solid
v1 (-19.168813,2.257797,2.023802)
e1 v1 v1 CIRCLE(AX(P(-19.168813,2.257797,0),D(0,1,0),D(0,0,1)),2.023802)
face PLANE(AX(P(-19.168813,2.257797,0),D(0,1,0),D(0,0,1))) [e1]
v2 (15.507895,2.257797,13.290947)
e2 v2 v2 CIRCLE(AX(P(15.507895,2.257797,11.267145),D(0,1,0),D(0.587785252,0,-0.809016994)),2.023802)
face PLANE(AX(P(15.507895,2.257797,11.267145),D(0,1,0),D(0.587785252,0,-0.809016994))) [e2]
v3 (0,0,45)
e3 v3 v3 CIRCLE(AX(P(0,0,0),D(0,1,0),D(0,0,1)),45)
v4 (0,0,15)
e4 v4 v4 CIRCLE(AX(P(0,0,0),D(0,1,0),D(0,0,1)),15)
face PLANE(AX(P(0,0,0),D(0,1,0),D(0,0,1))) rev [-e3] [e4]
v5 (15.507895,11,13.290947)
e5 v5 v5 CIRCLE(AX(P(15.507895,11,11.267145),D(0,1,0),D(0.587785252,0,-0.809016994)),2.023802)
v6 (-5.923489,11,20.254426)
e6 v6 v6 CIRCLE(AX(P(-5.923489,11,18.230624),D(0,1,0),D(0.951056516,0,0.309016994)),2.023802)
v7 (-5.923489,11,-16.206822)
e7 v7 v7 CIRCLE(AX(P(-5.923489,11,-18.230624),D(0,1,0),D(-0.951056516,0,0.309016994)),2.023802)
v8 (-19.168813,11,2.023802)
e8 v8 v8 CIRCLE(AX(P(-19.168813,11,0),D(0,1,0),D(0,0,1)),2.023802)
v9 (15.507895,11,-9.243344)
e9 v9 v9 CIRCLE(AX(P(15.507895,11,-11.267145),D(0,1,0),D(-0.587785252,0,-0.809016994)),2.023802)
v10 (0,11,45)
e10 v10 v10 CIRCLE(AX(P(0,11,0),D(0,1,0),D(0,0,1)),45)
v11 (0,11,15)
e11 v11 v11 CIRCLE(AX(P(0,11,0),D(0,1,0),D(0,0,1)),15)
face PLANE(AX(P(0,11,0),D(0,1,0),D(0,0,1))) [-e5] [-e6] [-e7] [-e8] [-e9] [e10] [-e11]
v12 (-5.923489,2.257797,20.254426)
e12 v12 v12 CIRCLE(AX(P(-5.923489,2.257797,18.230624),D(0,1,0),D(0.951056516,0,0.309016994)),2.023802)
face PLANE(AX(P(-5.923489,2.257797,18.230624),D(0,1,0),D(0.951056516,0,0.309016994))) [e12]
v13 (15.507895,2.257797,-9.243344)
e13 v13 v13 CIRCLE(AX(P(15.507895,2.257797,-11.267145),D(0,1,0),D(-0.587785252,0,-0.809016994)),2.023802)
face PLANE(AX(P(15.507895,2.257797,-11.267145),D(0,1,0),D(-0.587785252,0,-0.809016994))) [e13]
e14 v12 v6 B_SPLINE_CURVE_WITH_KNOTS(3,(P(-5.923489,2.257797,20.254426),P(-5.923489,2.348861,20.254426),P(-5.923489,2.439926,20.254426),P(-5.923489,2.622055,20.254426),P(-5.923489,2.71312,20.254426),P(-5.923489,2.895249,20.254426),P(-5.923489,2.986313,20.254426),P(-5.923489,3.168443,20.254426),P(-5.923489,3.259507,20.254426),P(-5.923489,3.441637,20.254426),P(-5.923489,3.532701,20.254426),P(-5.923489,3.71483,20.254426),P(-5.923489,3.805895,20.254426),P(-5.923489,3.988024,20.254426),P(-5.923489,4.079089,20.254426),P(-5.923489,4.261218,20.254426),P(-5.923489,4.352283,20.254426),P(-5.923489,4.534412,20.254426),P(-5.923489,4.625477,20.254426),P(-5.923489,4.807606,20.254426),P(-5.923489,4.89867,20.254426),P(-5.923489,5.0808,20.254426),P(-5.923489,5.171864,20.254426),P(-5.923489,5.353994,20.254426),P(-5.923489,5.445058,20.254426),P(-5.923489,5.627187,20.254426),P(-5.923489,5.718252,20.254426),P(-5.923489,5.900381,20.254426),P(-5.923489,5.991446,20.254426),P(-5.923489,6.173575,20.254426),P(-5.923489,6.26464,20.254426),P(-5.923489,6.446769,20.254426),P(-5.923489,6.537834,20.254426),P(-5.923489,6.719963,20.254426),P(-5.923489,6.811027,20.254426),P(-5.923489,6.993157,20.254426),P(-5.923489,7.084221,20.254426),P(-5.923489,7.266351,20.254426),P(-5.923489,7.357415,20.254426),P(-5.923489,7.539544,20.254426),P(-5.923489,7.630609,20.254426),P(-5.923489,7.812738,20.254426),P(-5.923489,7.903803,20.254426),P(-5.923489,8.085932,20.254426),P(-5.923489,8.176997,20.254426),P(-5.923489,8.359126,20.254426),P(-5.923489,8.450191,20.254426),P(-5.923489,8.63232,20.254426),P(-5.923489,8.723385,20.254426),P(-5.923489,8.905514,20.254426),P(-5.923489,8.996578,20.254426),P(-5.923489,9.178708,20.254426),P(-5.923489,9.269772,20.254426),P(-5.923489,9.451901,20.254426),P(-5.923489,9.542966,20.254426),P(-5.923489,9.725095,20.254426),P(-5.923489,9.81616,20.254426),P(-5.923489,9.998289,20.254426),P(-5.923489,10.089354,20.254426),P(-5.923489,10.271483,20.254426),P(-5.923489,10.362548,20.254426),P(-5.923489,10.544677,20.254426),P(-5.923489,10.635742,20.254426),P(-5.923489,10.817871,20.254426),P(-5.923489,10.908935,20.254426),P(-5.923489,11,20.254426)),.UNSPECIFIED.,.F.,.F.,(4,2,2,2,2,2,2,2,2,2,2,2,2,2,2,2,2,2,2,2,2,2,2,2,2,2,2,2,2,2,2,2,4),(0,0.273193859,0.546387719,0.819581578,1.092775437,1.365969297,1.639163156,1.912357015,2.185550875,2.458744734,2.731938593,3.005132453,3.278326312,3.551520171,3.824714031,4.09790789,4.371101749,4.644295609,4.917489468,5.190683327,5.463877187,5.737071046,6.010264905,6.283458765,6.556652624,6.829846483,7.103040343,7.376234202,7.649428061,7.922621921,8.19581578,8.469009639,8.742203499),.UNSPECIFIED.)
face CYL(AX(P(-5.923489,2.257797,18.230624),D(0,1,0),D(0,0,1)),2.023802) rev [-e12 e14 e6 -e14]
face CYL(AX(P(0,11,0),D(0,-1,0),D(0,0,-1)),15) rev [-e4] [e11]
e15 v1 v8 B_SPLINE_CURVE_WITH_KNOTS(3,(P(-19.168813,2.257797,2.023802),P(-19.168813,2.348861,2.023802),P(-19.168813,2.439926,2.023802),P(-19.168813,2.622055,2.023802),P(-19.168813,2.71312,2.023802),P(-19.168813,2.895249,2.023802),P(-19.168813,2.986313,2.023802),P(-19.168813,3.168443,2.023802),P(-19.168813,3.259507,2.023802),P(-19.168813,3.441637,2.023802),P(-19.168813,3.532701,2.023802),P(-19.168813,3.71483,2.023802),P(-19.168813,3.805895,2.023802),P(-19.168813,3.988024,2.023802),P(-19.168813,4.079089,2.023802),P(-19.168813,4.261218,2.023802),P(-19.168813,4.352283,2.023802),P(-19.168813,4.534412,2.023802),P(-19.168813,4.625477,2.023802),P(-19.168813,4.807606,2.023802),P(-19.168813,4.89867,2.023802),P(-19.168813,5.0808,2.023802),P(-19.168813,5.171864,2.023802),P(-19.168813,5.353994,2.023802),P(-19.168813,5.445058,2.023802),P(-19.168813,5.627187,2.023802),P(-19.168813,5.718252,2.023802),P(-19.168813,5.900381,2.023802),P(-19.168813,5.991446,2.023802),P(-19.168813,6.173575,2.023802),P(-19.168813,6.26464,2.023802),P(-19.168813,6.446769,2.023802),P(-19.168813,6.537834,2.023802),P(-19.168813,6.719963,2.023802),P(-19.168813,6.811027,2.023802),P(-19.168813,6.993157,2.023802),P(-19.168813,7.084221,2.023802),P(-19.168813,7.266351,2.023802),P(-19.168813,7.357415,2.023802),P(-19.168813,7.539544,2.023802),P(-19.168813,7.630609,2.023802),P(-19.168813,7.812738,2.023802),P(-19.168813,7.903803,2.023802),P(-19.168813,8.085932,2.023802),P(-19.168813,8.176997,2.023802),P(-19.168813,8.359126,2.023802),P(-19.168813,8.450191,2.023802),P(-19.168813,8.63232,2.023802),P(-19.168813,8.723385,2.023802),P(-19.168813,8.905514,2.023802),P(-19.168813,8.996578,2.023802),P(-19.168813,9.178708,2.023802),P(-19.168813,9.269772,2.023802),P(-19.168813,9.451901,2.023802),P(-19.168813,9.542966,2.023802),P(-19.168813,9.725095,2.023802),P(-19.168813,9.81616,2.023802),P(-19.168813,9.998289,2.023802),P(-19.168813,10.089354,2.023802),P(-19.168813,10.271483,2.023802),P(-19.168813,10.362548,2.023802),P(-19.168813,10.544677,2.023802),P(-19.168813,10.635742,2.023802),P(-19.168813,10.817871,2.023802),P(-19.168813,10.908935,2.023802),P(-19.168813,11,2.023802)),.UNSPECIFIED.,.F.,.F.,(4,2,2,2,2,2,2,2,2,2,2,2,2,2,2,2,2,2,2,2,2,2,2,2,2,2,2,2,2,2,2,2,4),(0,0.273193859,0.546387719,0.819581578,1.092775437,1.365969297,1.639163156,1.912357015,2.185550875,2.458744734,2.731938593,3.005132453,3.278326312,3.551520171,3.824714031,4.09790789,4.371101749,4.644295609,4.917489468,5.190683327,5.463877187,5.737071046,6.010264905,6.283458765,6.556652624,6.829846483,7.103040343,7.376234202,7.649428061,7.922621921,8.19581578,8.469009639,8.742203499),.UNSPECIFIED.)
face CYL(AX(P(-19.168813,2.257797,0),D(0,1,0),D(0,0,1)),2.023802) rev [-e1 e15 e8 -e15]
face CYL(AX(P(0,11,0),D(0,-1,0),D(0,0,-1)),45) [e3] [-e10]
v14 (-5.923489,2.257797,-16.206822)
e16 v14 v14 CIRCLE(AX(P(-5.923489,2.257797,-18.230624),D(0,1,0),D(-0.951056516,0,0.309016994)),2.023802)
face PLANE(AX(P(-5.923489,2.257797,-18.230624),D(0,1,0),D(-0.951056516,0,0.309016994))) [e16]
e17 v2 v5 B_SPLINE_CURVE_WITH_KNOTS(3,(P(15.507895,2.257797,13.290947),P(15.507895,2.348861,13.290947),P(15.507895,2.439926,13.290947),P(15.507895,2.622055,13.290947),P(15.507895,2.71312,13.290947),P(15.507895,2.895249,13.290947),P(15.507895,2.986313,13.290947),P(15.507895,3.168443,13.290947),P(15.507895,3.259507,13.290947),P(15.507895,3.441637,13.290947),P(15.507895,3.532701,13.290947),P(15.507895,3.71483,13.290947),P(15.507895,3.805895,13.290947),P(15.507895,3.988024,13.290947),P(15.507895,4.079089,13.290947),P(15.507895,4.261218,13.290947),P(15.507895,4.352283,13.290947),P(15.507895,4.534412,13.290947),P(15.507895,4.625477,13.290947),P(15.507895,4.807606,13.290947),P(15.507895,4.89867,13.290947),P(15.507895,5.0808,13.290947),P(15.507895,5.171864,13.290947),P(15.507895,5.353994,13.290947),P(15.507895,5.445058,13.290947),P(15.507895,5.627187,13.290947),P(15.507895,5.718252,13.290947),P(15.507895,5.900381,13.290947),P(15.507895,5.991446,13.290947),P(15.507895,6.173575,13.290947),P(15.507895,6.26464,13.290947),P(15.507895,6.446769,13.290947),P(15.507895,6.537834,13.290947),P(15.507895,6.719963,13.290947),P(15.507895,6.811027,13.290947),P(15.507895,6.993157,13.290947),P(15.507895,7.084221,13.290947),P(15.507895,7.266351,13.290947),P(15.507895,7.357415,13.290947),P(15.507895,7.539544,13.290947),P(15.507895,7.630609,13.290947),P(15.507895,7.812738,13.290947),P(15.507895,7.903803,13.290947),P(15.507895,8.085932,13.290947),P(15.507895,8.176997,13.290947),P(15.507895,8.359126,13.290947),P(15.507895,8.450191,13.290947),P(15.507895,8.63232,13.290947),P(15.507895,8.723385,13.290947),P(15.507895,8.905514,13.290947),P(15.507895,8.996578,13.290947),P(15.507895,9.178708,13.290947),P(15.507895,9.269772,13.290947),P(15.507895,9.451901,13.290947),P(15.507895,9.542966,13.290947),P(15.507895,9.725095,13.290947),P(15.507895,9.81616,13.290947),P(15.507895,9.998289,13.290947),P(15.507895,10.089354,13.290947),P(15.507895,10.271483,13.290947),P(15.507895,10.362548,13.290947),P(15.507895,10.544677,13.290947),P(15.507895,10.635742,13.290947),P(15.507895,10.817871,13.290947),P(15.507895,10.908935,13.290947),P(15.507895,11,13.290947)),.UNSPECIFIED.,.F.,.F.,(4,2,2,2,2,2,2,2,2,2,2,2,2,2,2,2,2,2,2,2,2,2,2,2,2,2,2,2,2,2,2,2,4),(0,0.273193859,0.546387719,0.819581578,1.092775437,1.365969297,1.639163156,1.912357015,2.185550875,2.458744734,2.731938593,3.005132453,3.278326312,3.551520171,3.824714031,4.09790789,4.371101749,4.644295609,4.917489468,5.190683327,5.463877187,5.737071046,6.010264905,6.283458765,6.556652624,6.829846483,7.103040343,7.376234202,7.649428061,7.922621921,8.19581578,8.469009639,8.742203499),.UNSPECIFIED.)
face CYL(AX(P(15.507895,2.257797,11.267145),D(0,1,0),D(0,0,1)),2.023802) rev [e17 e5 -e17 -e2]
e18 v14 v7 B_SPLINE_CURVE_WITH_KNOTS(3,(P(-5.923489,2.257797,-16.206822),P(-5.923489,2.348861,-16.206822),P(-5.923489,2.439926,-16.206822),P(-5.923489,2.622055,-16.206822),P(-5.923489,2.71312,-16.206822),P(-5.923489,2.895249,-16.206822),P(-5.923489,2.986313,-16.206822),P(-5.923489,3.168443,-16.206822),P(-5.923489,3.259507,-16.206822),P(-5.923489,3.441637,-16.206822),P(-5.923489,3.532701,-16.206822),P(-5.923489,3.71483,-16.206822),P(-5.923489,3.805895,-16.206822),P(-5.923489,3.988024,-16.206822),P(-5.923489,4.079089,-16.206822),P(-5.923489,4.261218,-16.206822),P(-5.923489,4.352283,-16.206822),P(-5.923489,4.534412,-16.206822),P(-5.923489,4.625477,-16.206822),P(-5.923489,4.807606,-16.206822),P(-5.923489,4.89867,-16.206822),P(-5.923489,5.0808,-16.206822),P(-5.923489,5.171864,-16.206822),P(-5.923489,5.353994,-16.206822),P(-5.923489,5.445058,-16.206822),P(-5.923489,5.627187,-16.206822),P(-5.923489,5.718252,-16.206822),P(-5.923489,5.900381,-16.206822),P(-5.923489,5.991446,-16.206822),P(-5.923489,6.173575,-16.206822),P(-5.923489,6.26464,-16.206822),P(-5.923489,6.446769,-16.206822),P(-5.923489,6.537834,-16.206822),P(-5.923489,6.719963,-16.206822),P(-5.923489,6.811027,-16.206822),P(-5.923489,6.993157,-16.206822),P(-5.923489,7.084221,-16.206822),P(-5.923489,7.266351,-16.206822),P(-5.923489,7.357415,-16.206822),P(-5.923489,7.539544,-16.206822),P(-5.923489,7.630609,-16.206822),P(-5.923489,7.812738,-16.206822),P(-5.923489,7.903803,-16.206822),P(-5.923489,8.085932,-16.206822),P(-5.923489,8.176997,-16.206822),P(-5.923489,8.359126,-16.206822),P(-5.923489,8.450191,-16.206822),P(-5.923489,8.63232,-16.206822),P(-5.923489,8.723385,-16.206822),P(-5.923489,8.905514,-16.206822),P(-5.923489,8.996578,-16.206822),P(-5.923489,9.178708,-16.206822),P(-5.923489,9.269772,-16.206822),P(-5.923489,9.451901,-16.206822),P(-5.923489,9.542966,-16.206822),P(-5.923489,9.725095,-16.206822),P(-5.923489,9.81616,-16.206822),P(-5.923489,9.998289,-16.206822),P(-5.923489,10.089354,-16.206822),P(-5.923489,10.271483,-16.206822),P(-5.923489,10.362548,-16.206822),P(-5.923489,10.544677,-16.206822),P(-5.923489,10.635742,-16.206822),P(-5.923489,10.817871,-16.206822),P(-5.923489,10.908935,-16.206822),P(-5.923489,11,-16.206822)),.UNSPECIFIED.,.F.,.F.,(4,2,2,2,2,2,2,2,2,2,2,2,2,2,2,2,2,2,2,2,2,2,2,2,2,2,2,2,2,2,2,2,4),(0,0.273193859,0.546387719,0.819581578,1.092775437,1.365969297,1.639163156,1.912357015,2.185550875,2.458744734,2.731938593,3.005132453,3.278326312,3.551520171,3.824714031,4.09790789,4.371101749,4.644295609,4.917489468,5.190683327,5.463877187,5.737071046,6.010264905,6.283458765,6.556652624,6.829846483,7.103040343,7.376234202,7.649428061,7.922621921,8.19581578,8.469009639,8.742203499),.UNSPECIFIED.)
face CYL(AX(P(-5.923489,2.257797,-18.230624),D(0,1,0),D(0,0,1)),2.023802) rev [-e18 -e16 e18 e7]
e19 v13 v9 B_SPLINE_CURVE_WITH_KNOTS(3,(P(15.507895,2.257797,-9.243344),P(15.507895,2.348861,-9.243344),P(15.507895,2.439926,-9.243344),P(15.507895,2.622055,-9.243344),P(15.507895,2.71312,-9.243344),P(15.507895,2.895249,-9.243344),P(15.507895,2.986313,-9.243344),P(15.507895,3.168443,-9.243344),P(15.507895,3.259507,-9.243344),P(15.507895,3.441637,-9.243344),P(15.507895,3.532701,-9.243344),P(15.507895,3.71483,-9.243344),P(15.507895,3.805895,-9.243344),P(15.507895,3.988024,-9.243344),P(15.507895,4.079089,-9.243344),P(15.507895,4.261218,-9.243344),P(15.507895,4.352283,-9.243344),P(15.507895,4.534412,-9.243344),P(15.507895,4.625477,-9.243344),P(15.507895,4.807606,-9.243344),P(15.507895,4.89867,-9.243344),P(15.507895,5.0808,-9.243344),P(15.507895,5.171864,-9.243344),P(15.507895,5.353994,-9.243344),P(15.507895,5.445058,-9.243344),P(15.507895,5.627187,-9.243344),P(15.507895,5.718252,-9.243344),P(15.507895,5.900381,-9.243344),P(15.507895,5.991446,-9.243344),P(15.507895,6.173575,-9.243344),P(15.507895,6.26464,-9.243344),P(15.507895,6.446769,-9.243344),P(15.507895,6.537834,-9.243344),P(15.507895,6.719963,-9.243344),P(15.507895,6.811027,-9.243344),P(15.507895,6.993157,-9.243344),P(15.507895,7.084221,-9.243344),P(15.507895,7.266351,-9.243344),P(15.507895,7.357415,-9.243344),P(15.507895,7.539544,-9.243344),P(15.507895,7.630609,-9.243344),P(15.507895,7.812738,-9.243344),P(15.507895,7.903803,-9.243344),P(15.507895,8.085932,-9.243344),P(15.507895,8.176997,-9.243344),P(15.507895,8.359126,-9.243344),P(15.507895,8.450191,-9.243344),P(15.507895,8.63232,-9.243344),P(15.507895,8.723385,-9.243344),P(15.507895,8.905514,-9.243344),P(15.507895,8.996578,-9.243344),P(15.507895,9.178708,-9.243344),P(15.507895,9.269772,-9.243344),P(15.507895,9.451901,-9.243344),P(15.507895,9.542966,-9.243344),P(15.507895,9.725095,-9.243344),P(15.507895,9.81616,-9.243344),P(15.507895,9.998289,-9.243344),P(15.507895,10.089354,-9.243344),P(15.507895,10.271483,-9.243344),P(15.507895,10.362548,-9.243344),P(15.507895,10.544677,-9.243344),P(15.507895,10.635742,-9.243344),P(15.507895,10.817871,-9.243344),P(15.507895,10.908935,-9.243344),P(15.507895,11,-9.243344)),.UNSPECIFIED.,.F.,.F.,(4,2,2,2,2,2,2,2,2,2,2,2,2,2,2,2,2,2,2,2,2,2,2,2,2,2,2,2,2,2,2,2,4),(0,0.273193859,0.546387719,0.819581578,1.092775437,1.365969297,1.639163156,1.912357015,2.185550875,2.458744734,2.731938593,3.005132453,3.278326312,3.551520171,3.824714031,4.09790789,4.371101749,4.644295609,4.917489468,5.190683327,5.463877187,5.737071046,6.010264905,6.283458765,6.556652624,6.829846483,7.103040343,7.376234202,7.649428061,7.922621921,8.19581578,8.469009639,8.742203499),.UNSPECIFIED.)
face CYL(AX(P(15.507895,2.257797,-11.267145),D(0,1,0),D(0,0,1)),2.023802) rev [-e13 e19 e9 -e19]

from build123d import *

# Parameters (mm, degrees)
SKETCH1_R           = 45
BOSS_EXTRUDE1_DEPTH = 11
SKETCH2_R           = 15
CUT_EXTRUDE1_DEPTH  = 65.58327957
SKETCH3_R           = 2.02380195
CUT_EXTRUDE2_DEPTH  = 8.742203499
CIRPATTERN1_COUNT   = 5


with BuildPart() as part:
    # Sketch1 → Boss-Extrude1 (new body)
    with BuildSketch(Plane(origin=(0, 0, 0), x_dir=(1, 0, 0), z_dir=(0, 1, 0))):
        Circle(SKETCH1_R)
    extrude(amount=BOSS_EXTRUDE1_DEPTH)

    # Sketch2 → Cut-Extrude1 (cut, through all)
    with BuildSketch(Plane(origin=(0, 0, 0), x_dir=(1, 0, 0), z_dir=(0, 1, 0))):
        Circle(SKETCH2_R)
    extrude(amount=CUT_EXTRUDE1_DEPTH, mode=Mode.SUBTRACT)

    # Sketch3 → Cut-Extrude2 (cut)
    with BuildSketch(Plane(origin=(0, 11, 0), x_dir=(1, 0, 0), z_dir=(0, 1, 0))):
        with Locations((-19.168812802, 0)):
            Circle(SKETCH3_R)
    cut_extrude2 = extrude(amount=-CUT_EXTRUDE2_DEPTH, mode=Mode.SUBTRACT)

    # CirPattern1: Cut-Extrude2 ×5 about axis
    cirpattern1_axis = Axis((0, 0, 0), (0, 1, 0))
    for i in range(1, CIRPATTERN1_COUNT):
        add(cut_extrude2.rotate(cirpattern1_axis, i * 360 / CIRPATTERN1_COUNT), mode=Mode.SUBTRACT)


solid = part.part
